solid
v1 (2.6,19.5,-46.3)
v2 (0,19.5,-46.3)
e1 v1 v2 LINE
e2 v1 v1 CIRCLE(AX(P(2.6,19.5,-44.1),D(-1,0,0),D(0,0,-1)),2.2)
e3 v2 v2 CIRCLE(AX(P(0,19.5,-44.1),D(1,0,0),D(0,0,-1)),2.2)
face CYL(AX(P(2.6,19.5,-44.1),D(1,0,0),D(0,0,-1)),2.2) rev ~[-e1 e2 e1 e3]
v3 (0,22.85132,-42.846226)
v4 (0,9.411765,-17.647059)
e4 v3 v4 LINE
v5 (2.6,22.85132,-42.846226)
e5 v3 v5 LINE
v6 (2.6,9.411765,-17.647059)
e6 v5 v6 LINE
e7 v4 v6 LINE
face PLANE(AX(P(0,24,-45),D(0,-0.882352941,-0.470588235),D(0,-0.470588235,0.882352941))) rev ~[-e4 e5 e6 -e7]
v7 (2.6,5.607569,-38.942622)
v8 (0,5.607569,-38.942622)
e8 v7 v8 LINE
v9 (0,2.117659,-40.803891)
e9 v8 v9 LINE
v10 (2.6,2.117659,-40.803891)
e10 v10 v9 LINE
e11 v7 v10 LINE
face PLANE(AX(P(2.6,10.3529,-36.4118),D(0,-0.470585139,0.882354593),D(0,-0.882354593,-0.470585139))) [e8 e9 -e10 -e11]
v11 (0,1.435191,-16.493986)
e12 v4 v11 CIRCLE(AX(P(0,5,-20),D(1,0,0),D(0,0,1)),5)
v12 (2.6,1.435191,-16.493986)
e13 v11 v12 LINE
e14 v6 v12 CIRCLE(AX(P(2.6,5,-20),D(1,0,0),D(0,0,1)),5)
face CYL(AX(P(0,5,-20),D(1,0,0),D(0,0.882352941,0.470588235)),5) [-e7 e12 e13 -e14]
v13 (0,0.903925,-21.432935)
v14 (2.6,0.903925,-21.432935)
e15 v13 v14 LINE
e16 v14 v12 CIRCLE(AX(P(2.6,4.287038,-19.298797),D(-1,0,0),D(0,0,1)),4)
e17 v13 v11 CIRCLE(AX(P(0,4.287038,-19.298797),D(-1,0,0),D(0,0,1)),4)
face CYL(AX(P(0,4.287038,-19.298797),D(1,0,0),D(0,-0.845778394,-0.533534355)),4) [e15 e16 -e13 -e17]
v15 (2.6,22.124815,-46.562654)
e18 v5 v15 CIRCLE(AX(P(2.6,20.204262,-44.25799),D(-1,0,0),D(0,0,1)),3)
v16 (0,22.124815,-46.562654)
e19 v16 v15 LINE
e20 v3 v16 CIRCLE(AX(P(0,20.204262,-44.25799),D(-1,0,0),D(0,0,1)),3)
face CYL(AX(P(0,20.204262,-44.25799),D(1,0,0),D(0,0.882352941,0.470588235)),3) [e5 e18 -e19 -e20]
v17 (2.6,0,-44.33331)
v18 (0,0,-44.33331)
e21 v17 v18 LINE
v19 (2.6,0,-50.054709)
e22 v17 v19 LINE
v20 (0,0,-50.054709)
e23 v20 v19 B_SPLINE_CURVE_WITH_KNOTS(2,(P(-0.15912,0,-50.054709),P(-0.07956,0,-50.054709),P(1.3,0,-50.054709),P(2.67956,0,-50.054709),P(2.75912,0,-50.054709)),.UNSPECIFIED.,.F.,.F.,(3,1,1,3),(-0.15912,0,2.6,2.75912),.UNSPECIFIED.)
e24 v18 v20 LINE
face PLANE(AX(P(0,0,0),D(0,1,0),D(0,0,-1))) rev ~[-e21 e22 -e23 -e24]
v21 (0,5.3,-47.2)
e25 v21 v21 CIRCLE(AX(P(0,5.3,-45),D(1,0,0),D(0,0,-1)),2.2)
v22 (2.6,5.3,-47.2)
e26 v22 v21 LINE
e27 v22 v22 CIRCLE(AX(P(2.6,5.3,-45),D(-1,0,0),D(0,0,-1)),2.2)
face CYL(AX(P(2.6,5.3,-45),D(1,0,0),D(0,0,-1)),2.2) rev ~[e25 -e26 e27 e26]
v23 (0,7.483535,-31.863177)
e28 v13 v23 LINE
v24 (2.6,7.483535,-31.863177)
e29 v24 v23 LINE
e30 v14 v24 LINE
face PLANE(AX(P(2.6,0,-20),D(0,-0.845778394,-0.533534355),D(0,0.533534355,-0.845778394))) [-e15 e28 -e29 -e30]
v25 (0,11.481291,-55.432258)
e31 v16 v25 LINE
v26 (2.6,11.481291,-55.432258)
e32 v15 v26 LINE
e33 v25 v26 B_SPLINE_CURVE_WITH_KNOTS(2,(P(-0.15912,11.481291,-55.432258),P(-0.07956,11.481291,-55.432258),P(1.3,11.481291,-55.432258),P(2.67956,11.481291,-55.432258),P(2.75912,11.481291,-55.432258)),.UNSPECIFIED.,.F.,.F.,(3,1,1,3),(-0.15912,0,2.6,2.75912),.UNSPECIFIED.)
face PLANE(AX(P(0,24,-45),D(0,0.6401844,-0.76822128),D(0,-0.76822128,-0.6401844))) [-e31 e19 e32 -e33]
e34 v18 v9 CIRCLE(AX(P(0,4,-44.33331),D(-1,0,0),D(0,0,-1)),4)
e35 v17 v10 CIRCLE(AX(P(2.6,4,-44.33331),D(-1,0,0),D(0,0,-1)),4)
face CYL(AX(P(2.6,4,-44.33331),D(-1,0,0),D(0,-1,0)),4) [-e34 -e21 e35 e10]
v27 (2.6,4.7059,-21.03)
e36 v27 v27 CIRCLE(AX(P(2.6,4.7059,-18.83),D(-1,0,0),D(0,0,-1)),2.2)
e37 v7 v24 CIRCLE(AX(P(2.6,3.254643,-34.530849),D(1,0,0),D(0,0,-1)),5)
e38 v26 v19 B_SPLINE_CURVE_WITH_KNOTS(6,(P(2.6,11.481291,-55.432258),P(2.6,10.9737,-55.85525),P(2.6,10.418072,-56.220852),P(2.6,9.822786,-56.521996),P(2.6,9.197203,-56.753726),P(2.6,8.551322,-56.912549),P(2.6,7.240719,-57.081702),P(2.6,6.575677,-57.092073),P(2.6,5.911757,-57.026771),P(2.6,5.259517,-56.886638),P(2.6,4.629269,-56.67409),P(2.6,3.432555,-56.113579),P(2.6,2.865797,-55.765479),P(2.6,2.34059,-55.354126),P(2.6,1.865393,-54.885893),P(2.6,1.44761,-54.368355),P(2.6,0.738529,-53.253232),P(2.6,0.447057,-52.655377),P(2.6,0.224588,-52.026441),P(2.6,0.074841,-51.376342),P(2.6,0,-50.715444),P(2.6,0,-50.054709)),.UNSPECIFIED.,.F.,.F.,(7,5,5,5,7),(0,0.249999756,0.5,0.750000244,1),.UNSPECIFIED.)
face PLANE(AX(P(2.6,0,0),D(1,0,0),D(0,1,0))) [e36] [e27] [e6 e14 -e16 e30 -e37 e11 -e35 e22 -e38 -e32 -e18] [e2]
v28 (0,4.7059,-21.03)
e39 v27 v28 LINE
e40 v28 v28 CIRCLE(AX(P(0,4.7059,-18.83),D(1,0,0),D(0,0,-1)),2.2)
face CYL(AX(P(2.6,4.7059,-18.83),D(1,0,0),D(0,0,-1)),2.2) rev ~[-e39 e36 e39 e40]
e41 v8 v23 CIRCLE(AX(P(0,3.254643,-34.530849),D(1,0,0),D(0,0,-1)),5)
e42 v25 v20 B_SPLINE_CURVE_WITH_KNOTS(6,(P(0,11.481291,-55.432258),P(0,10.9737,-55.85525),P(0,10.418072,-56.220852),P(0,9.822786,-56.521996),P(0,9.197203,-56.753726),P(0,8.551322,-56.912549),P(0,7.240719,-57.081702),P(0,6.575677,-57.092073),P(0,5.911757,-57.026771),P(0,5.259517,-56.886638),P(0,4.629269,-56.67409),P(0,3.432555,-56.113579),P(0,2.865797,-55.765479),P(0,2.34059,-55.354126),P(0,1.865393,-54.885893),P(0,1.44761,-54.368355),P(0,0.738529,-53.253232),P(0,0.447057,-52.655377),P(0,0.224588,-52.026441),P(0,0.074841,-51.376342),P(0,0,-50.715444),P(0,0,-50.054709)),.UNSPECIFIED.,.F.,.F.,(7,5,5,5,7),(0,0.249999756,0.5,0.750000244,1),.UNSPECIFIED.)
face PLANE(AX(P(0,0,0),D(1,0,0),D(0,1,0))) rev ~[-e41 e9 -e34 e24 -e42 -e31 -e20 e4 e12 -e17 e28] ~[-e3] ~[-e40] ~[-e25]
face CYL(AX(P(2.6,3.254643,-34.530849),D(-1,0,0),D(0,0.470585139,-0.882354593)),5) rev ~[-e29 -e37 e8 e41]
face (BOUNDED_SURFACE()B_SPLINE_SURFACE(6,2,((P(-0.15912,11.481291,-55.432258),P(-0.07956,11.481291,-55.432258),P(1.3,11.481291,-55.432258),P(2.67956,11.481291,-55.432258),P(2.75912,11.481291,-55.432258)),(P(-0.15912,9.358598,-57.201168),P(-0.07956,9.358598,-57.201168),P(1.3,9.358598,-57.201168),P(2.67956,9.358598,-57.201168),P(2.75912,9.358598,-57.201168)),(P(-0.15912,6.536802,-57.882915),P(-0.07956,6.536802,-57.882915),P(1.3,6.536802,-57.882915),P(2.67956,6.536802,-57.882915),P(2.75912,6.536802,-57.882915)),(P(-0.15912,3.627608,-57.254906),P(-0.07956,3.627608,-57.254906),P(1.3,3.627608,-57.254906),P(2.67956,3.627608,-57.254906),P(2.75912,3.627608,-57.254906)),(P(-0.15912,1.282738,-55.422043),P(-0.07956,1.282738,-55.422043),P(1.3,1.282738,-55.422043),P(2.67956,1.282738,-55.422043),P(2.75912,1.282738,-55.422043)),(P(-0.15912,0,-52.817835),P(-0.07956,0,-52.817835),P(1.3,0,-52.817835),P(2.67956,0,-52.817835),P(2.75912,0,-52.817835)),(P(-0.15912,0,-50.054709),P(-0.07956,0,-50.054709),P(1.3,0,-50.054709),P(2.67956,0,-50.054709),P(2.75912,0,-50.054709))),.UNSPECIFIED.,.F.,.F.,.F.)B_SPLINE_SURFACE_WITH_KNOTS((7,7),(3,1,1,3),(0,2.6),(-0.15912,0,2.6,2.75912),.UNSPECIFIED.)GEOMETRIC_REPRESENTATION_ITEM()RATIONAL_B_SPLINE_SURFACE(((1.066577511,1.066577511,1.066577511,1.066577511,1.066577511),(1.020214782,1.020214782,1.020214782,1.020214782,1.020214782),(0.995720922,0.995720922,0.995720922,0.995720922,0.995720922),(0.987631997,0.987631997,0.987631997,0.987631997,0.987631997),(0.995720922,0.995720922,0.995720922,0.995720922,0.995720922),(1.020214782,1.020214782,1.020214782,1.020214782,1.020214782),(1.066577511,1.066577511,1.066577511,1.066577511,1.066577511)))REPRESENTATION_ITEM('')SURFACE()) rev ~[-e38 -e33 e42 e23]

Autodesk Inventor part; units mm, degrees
ref_plane "YZ Plane" through (0, 0, 0) normal (1, 0, 0) x (0, 1, 0)
ref_plane "XZ Plane" through (0, 0, 0) normal (0, 1, 0) x (-1, 0, 0)
ref_plane "XY Plane" through (0, 0, 0) normal (0, 0, 1) x (1, 0, 0)
sketch "Boceto1" plane through (0, 0, 0) normal (1, 0, 0) x (0, 1, 0)
  line L0 (0, 0) -> (0, -65)
  line L1 (0, -65) -> (24, -65)
  line L2 (24, -65) -> (24, -45)
  line L3 (24, -45) -> (0, -65)
  line L4 (24, -45) -> (0, 0)
  line L5 (0, -65) -> (0, -60)
  dimension "d0" = 65
  dimension "d6" = 24
  dimension "d7" = 20
  dimension "d8" = 5
extrude "Extrusión1" add sketch "Boceto1" along normal blind 2.6 contours L4 L3 L0
fillet "Empalme1" radius 7 1 edges at (1.3, 0, -65)
fillet "Empalme2" radius 5 1 edges at (1.3, 0, 0)
fillet "Empalme3" radius 3 1 edges at (1.3, 24, -45)
sketch "Boceto2" plane through (2.6, 0, 0) normal (1, 0, 0) x (0, 0, -1)
  line L0 (0, 0) -> (49.1759, 26.2271)
  line L1 (42.8462, 22.8513) -> (17.6471, 9.4118) projected
  line L2 (0, 0) -> (69.4683, 0)
  arc A0 (50.0547, 0) -> (55.4323, 11.4813) centre (50.0547, 7) ccw projected
  line L3 (55.4323, 11.4813) -> (45, 24)
  line L4 (55.4323, 11.4813) -> (46.5627, 22.1248) projected
  line L5 (45, 24) -> (45, 0)
  circle A1 centre (45, 5.3) radius 2.2
  circle A2 centre (44.1, 19.5) radius 2.2
  line L6 (17.6471, 9.4118) -> (20.0129, 0)
  circle A3 centre (18.83, 4.7059) radius 2.2
  dimension "d14" = 4.4
  dimension "d15" = 5.3
  dimension "d18" = 4.4
  dimension "d19" = 0.9
  dimension "d20" = 19.5
  dimension "d21" = 4.4
  dimension "d22" = 26.17
extrude "Extrusión2" cut sketch "Boceto2" against normal blind 10 contours A3 L6 | L6 A3 | A1 L5 | L5 A1 | A2 L5 | L5 A2
sketch "Boceto3" plane through (2.6, 0, 0) normal (1, 0, 0) x (0, 0, -1)
  arc A0 (17.6471, 9.4118) -> (20, 0) centre (20, 5) ccw projected
  line L0 (55.4323, 11.4813) -> (46.5627, 22.1248) projected
  line L1 (42.8462, 22.8513) -> (17.6471, 9.4118) projected
  line L2 (32.6471, 17.4118) -> (36.4118, 10.3529)
  line L3 (20, 0) -> (36.4118, 10.3529)
  line L4 (36.4118, 10.3529) -> (41.9333, 0)
  line L5 (20, 0) -> (50.0547, 0) projected
  line L6 (20, 0) -> (41.9333, 0)
  point P0 (0, 0)
  dimension "d24" = 90
  dimension "d25" = 8
  dimension "d26" = 17
  dimension "d27" = 11.7333
extrude "Extrusión3" cut sketch "Boceto3" against normal blind 10 contours L3 L4 L5
fillet "Empalme4" radius 4 2 edges at (1.3, 0, -20) (1.3, 0, -41.9333)
fillet "Empalme de cara1" radius 5 1 edges at (1.3, 10.3529, -36.4118)
properties part number "Palanca_barra"
